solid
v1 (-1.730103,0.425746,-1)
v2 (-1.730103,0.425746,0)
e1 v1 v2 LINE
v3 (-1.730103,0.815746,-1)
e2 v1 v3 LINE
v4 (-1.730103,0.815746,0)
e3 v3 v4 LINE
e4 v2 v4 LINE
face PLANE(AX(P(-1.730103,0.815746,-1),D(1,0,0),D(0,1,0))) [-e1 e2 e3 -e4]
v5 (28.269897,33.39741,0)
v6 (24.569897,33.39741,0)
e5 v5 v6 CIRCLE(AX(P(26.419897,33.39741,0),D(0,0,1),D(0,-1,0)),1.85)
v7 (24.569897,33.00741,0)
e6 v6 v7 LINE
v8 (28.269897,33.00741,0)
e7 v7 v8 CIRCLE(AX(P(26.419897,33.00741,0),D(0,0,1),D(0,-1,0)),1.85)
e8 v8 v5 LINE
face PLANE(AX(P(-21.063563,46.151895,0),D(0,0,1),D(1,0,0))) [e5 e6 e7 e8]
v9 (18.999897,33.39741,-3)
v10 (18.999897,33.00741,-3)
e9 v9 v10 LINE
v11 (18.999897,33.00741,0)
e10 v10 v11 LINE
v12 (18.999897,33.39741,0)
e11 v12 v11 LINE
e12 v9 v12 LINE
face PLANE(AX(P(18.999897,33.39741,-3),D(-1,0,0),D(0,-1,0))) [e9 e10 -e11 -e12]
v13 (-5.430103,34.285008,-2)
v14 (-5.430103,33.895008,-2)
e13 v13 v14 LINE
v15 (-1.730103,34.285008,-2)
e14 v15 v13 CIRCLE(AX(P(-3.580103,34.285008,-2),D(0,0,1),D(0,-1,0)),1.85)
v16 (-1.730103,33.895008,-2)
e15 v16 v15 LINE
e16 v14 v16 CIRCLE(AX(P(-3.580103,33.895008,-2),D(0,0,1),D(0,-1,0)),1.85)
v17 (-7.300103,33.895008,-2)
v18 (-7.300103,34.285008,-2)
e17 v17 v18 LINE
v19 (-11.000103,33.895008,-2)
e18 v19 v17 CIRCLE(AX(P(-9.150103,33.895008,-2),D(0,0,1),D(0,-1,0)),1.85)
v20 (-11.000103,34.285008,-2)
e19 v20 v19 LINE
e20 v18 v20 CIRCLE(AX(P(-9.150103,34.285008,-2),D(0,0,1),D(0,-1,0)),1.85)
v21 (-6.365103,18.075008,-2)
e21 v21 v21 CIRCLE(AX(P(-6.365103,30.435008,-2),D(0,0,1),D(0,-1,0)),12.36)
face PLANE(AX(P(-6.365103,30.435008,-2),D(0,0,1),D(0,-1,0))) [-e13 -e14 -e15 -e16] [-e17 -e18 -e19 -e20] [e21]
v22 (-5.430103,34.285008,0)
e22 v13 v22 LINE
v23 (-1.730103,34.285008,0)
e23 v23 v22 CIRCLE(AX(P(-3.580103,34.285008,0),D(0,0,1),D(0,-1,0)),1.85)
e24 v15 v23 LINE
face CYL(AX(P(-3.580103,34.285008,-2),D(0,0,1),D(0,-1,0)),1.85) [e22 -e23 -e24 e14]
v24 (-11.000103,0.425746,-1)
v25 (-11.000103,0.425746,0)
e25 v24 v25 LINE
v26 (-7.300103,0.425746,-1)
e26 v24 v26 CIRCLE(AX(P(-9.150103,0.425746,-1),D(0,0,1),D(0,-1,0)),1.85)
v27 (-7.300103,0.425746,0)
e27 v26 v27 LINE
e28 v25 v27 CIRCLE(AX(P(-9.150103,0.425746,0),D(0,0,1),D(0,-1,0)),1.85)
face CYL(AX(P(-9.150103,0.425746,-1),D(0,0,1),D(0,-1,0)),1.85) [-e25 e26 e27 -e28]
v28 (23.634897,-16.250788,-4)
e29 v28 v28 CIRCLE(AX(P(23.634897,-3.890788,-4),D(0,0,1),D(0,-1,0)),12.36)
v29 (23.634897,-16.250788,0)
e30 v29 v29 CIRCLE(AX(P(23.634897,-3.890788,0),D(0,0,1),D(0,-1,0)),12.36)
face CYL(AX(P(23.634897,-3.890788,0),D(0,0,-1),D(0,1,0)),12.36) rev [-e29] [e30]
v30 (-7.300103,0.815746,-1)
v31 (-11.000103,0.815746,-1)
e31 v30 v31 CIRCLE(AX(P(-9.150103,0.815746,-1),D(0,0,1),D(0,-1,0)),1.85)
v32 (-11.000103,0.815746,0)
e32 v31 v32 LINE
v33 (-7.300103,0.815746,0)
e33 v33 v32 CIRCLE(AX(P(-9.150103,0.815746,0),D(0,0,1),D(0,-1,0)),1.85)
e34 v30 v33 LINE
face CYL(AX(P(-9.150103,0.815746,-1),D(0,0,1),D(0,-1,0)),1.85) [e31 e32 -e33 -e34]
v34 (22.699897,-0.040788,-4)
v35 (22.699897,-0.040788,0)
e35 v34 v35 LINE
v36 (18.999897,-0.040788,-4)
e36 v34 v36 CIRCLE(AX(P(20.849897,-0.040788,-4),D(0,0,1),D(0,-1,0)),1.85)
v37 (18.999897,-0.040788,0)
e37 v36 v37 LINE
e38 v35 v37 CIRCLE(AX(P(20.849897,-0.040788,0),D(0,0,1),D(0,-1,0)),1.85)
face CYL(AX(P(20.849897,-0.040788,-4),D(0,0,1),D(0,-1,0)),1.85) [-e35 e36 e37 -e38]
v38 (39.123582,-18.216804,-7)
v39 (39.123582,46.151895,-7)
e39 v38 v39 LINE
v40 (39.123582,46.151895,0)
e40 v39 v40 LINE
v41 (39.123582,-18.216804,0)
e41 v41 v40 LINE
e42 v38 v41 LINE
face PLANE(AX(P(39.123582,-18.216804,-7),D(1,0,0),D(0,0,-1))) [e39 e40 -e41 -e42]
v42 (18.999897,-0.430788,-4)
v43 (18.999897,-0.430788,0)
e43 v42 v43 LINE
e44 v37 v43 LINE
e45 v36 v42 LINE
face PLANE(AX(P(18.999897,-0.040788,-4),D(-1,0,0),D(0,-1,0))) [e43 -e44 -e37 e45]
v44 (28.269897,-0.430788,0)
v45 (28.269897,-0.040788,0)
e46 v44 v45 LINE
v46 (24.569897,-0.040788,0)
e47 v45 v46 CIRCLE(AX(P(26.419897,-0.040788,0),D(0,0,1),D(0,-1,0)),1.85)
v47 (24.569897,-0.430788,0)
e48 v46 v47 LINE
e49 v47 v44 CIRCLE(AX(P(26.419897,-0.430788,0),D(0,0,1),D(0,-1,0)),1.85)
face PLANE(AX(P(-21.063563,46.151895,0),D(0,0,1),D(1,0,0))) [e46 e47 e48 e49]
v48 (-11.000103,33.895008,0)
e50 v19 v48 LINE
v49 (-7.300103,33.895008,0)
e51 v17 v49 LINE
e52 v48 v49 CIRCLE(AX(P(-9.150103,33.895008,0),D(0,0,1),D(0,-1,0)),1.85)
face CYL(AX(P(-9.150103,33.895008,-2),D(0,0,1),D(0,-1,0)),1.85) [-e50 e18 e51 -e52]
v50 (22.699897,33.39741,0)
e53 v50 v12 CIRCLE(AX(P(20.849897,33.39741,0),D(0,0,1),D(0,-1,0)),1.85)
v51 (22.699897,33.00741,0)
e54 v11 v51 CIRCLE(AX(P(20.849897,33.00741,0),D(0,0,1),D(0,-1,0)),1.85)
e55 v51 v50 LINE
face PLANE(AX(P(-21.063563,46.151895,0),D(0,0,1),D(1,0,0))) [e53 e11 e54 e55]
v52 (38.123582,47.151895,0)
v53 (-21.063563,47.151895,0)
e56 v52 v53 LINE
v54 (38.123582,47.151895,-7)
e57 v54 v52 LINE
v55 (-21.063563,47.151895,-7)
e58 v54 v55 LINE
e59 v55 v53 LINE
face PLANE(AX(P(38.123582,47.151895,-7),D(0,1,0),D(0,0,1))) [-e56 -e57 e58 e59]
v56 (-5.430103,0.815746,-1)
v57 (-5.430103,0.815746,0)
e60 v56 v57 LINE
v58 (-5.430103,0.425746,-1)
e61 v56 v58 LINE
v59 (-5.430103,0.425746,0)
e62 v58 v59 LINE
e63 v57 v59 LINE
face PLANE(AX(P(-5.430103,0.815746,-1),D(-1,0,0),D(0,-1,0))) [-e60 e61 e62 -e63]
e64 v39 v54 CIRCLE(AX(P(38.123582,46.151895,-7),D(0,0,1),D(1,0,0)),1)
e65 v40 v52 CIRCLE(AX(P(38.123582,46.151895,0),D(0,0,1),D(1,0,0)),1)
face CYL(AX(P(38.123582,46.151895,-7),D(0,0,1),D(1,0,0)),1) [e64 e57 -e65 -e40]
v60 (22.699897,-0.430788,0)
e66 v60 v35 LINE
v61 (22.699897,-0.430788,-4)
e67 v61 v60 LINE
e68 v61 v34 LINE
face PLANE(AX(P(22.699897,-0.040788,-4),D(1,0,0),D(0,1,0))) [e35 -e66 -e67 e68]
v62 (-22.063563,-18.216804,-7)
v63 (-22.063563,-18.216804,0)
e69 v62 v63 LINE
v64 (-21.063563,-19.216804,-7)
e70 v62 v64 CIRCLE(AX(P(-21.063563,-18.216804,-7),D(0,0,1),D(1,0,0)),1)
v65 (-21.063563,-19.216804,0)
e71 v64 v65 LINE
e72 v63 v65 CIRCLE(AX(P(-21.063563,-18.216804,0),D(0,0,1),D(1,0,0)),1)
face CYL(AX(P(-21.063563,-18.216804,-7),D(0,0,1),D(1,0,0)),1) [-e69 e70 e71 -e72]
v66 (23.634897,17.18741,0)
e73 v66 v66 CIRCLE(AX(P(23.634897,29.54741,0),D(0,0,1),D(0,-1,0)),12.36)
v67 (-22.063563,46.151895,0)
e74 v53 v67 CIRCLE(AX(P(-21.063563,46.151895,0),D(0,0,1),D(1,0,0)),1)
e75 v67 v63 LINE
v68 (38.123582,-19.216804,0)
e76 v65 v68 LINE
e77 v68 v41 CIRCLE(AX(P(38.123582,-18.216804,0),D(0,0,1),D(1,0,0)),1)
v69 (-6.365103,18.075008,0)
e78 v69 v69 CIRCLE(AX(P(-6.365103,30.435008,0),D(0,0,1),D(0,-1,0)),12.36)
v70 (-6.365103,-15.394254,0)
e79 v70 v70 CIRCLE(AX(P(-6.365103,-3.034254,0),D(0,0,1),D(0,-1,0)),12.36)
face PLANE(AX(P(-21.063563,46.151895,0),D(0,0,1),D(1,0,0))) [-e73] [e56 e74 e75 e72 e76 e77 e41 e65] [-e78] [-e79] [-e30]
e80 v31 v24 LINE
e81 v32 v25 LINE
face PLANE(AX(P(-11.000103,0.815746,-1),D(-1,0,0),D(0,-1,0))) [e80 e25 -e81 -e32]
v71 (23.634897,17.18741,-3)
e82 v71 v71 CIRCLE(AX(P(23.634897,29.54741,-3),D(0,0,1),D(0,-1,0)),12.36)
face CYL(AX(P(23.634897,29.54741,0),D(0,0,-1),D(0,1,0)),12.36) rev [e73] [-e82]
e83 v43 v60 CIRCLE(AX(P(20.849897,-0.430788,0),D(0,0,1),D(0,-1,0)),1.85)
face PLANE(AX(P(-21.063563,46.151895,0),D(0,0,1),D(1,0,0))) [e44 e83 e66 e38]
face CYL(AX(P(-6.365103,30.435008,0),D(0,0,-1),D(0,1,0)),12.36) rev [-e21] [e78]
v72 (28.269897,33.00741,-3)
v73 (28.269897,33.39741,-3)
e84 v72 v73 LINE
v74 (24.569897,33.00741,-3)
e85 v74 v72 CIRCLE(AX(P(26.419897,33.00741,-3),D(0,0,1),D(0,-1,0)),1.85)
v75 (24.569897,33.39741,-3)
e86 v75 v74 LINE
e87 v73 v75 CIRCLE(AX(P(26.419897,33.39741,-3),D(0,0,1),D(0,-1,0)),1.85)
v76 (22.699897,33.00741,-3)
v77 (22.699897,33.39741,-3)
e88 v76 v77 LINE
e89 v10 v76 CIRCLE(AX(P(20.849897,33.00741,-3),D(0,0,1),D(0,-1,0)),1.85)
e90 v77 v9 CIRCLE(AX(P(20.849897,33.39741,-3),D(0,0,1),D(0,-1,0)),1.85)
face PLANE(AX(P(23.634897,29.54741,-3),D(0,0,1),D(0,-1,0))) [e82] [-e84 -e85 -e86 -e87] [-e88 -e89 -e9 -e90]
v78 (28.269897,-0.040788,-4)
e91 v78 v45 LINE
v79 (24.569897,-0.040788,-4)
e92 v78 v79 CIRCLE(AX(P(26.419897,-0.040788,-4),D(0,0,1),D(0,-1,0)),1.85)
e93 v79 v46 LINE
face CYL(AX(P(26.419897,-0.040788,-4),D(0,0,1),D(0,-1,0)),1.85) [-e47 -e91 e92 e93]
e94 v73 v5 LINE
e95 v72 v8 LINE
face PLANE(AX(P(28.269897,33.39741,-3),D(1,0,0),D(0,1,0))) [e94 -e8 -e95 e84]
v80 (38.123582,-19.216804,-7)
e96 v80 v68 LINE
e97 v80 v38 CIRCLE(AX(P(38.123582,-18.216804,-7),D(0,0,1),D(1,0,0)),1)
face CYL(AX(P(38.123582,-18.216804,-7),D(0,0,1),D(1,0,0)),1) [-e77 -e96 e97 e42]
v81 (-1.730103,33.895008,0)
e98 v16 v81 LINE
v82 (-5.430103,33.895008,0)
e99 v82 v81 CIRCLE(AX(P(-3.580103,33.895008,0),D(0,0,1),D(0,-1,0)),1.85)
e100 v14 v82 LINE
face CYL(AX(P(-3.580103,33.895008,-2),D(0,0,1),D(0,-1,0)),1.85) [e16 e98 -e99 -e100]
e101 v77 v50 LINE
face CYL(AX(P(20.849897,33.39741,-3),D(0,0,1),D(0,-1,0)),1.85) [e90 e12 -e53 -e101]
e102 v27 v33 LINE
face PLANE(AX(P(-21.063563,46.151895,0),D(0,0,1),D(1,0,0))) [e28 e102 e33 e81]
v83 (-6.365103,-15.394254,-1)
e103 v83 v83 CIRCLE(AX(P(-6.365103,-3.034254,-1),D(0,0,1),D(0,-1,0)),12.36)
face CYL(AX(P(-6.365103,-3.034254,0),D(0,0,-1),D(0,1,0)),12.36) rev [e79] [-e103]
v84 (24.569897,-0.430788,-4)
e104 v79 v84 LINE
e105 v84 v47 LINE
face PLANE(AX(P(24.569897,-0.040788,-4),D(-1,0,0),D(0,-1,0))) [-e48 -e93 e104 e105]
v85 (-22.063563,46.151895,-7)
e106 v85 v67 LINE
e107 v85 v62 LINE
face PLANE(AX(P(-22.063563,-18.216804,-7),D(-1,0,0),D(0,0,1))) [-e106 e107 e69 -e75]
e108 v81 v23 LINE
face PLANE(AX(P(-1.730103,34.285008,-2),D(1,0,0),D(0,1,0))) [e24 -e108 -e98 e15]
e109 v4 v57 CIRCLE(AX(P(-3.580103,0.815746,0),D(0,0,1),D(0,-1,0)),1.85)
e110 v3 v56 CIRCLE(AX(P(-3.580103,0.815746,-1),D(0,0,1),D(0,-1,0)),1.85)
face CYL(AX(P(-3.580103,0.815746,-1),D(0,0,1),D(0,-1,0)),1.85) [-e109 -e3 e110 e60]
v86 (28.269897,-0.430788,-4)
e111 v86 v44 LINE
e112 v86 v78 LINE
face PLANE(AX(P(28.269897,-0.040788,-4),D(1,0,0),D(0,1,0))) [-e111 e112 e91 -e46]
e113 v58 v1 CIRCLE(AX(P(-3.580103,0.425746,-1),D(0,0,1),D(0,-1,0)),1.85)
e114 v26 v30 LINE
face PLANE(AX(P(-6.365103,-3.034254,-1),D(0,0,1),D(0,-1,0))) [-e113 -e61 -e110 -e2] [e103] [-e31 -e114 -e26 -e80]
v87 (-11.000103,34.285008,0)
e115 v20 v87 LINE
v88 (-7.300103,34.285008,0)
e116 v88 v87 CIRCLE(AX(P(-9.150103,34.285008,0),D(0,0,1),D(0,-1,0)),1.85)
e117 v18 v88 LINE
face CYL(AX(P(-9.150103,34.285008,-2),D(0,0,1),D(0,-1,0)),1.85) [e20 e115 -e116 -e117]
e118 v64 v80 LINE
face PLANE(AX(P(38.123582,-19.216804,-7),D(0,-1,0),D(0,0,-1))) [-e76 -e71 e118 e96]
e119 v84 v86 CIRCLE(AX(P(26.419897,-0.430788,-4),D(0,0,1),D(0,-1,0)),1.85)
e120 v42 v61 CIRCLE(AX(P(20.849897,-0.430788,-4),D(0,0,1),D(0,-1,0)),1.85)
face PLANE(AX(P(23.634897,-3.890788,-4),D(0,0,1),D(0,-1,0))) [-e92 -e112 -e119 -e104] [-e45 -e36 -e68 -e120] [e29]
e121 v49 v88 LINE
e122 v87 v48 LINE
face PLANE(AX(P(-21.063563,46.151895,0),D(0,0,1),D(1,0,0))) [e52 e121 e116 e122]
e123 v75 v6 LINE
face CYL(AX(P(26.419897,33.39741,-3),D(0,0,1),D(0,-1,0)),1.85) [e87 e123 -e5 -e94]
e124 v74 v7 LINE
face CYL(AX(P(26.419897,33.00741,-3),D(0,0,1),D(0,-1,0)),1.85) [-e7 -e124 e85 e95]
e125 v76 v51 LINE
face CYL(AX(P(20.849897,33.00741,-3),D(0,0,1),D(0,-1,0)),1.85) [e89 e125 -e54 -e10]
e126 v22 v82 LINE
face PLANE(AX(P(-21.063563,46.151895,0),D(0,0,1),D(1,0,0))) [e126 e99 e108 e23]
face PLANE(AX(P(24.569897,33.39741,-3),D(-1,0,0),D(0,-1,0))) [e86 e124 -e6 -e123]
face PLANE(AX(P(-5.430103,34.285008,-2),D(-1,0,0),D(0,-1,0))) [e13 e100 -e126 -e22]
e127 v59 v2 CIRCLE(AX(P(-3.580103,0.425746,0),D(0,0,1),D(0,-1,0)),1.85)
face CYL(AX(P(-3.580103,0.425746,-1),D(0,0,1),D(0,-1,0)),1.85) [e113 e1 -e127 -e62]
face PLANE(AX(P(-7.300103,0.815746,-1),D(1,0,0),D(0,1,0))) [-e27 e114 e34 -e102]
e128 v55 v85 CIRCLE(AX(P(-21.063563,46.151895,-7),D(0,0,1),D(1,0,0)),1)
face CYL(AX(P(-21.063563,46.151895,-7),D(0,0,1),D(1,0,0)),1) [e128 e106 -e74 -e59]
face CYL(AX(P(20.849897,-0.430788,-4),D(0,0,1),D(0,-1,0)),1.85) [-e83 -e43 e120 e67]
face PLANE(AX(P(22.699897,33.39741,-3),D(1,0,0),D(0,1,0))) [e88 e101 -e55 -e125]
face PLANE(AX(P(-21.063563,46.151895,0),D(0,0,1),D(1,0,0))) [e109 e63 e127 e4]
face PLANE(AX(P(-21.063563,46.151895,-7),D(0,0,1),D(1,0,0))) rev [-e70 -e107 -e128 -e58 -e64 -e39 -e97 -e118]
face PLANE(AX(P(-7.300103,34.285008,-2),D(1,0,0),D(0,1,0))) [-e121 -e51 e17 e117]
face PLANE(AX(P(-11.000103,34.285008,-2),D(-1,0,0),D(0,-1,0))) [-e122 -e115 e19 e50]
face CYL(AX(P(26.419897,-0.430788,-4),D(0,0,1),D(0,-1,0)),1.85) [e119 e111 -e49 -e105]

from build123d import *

# Parameters (mm, degrees)
BOSS_EXTRUDE1_DEPTH = 7
CAVITY1_START       = -3
CAVITY1_OUTLINE_R   = 12.36
CAVITY1_DEPTH       = 3
CAVITY1_START_2     = -2
CAVITY1_2_OUTLINE_R = 12.36
CAVITY1_2_DEPTH     = 2
CAVITY1_START_3     = -4
CAVITY1_3_OUTLINE_R = 12.36
CAVITY1_3_DEPTH     = 1
CAVITY1_START_4     = -1
CAVITY1_4_OUTLINE_R = 12.36
CAVITY1_4_DEPTH     = 1


# Read off the part's stored shape, not the designer's step: Cavity1
with BuildPart() as part:
    # Sketch1 → Boss-Extrude1 (new body)
    with BuildSketch(Plane.XY):
        with BuildLine():
            Line((38.123582206, -19.216804324), (-21.063563238, -19.216804324))
            ThreePointArc((-21.063563238, -19.216804324), (-21.770670019, -18.923911105), (-22.063563238, -18.216804324))
            Line((-22.063563238, -18.216804324), (-22.063563238, 46.15189529))
            ThreePointArc((-22.063563238, 46.15189529), (-21.770670019, 46.859002071), (-21.063563238, 47.15189529))
            Line((-21.063563238, 47.15189529), (38.123582206, 47.15189529))
            ThreePointArc((38.123582206, 47.15189529), (38.830688987, 46.859002071), (39.123582206, 46.15189529))
            Line((39.123582206, 46.15189529), (39.123582206, -18.216804324))
            ThreePointArc((39.123582206, -18.216804324), (38.830688987, -18.923911105), (38.123582206, -19.216804324))
        make_face()
    extrude(amount=-BOSS_EXTRUDE1_DEPTH)

    # Cavity1 outline → Cavity1 (cut)
    # profile 1 of 2: a face of its own
    with BuildSketch(Plane.XY.offset(CAVITY1_START)):
        with Locations((23.634896534, -3.890788044)):
            Circle(CAVITY1_OUTLINE_R)
        with BuildLine():
            ThreePointArc((18.999896534, -0.040788044), (20.849896534, 1.809211956), (22.699896534, -0.040788044))
            Line((22.699896534, -0.040788044), (22.699896534, -0.430788044))
            ThreePointArc((22.699896534, -0.430788044), (20.849896534, -2.280788044), (18.999896534, -0.430788044))
            Line((18.999896534, -0.430788044), (18.999896534, -0.040788044))
        make_face(mode=Mode.SUBTRACT)
        with BuildLine():
            ThreePointArc((24.569896534, -0.040788044), (26.419896534, 1.809211956), (28.269896534, -0.040788044))
            Line((28.269896534, -0.040788044), (28.269896534, -0.430788044))
            ThreePointArc((28.269896534, -0.430788044), (26.419896534, -2.280788044), (24.569896534, -0.430788044))
            Line((24.569896534, -0.430788044), (24.569896534, -0.040788044))
        make_face(mode=Mode.SUBTRACT)
    # profile 2 of 2: a face of its own
    with BuildSketch(Plane.XY.offset(CAVITY1_START)):
        with Locations((23.634896534, 29.54740971)):
            Circle(CAVITY1_OUTLINE_R)
        with BuildLine():
            Line((22.699896534, 33.39740971), (22.699896534, 33.00740971))
            ThreePointArc((22.699896534, 33.00740971), (20.849896534, 31.15740971), (18.999896534, 33.00740971))
            Line((18.999896534, 33.00740971), (18.999896534, 33.39740971))
            ThreePointArc((18.999896534, 33.39740971), (20.849896534, 35.24740971), (22.699896534, 33.39740971))
        make_face(mode=Mode.SUBTRACT)
        with BuildLine():
            Line((28.269896534, 33.39740971), (28.269896534, 33.00740971))
            ThreePointArc((28.269896534, 33.00740971), (26.419896534, 31.15740971), (24.569896534, 33.00740971))
            Line((24.569896534, 33.00740971), (24.569896534, 33.39740971))
            ThreePointArc((24.569896534, 33.39740971), (26.419896534, 35.24740971), (28.269896534, 33.39740971))
        make_face(mode=Mode.SUBTRACT)
    extrude(amount=CAVITY1_DEPTH, mode=Mode.SUBTRACT)

    # Cavity1 2 outline → Cavity1 2 (cut)
    with BuildSketch(Plane.XY.offset(CAVITY1_START_2)):
        with Locations((-6.365103466, 30.435007788)):
            Circle(CAVITY1_2_OUTLINE_R)
        with BuildLine():
            ThreePointArc((-11.000103466, 34.285007788), (-9.150103466, 36.135007788), (-7.300103466, 34.285007788))
            Line((-7.300103466, 34.285007788), (-7.300103466, 33.895007788))
            ThreePointArc((-7.300103466, 33.895007788), (-9.150103466, 32.045007788), (-11.000103466, 33.895007788))
            Line((-11.000103466, 33.895007788), (-11.000103466, 34.285007788))
        make_face(mode=Mode.SUBTRACT)
        with BuildLine():
            ThreePointArc((-5.430103466, 34.285007788), (-3.580103466, 36.135007788), (-1.730103466, 34.285007788))
            Line((-1.730103466, 34.285007788), (-1.730103466, 33.895007788))
            ThreePointArc((-1.730103466, 33.895007788), (-3.580103466, 32.045007788), (-5.430103466, 33.895007788))
            Line((-5.430103466, 33.895007788), (-5.430103466, 34.285007788))
        make_face(mode=Mode.SUBTRACT)
    extrude(amount=CAVITY1_2_DEPTH, mode=Mode.SUBTRACT)

    # Cavity1 3 outline → Cavity1 3 (cut)
    with BuildSketch(Plane.XY.offset(CAVITY1_START_3)):
        with Locations((23.634896534, -3.890788044)):
            Circle(CAVITY1_3_OUTLINE_R)
        with BuildLine():
            ThreePointArc((18.999896534, -0.040788044), (20.849896534, 1.809211956), (22.699896534, -0.040788044))
            Line((22.699896534, -0.040788044), (22.699896534, -0.430788044))
            ThreePointArc((22.699896534, -0.430788044), (20.849896534, -2.280788044), (18.999896534, -0.430788044))
            Line((18.999896534, -0.430788044), (18.999896534, -0.040788044))
        make_face(mode=Mode.SUBTRACT)
        with BuildLine():
            ThreePointArc((24.569896534, -0.040788044), (26.419896534, 1.809211956), (28.269896534, -0.040788044))
            Line((28.269896534, -0.040788044), (28.269896534, -0.430788044))
            ThreePointArc((28.269896534, -0.430788044), (26.419896534, -2.280788044), (24.569896534, -0.430788044))
            Line((24.569896534, -0.430788044), (24.569896534, -0.040788044))
        make_face(mode=Mode.SUBTRACT)
    extrude(amount=CAVITY1_3_DEPTH, mode=Mode.SUBTRACT)

    # Cavity1 4 outline → Cavity1 4 (cut)
    with BuildSketch(Plane.XY.offset(CAVITY1_START_4)):
        with Locations((-6.365103466, -3.03425393)):
            Circle(CAVITY1_4_OUTLINE_R)
        with BuildLine():
            Line((-7.300103466, 0.81574607), (-7.300103466, 0.42574607))
            ThreePointArc((-7.300103466, 0.42574607), (-9.150103466, -1.42425393), (-11.000103466, 0.42574607))
            Line((-11.000103466, 0.42574607), (-11.000103466, 0.81574607))
            ThreePointArc((-11.000103466, 0.81574607), (-9.150103466, 2.66574607), (-7.300103466, 0.81574607))
        make_face(mode=Mode.SUBTRACT)
        with BuildLine():
            Line((-1.730103466, 0.81574607), (-1.730103466, 0.42574607))
            ThreePointArc((-1.730103466, 0.42574607), (-3.580103466, -1.42425393), (-5.430103466, 0.42574607))
            Line((-5.430103466, 0.42574607), (-5.430103466, 0.81574607))
            ThreePointArc((-5.430103466, 0.81574607), (-3.580103466, 2.66574607), (-1.730103466, 0.81574607))
        make_face(mode=Mode.SUBTRACT)
    extrude(amount=CAVITY1_4_DEPTH, mode=Mode.SUBTRACT)


solid = part.part
